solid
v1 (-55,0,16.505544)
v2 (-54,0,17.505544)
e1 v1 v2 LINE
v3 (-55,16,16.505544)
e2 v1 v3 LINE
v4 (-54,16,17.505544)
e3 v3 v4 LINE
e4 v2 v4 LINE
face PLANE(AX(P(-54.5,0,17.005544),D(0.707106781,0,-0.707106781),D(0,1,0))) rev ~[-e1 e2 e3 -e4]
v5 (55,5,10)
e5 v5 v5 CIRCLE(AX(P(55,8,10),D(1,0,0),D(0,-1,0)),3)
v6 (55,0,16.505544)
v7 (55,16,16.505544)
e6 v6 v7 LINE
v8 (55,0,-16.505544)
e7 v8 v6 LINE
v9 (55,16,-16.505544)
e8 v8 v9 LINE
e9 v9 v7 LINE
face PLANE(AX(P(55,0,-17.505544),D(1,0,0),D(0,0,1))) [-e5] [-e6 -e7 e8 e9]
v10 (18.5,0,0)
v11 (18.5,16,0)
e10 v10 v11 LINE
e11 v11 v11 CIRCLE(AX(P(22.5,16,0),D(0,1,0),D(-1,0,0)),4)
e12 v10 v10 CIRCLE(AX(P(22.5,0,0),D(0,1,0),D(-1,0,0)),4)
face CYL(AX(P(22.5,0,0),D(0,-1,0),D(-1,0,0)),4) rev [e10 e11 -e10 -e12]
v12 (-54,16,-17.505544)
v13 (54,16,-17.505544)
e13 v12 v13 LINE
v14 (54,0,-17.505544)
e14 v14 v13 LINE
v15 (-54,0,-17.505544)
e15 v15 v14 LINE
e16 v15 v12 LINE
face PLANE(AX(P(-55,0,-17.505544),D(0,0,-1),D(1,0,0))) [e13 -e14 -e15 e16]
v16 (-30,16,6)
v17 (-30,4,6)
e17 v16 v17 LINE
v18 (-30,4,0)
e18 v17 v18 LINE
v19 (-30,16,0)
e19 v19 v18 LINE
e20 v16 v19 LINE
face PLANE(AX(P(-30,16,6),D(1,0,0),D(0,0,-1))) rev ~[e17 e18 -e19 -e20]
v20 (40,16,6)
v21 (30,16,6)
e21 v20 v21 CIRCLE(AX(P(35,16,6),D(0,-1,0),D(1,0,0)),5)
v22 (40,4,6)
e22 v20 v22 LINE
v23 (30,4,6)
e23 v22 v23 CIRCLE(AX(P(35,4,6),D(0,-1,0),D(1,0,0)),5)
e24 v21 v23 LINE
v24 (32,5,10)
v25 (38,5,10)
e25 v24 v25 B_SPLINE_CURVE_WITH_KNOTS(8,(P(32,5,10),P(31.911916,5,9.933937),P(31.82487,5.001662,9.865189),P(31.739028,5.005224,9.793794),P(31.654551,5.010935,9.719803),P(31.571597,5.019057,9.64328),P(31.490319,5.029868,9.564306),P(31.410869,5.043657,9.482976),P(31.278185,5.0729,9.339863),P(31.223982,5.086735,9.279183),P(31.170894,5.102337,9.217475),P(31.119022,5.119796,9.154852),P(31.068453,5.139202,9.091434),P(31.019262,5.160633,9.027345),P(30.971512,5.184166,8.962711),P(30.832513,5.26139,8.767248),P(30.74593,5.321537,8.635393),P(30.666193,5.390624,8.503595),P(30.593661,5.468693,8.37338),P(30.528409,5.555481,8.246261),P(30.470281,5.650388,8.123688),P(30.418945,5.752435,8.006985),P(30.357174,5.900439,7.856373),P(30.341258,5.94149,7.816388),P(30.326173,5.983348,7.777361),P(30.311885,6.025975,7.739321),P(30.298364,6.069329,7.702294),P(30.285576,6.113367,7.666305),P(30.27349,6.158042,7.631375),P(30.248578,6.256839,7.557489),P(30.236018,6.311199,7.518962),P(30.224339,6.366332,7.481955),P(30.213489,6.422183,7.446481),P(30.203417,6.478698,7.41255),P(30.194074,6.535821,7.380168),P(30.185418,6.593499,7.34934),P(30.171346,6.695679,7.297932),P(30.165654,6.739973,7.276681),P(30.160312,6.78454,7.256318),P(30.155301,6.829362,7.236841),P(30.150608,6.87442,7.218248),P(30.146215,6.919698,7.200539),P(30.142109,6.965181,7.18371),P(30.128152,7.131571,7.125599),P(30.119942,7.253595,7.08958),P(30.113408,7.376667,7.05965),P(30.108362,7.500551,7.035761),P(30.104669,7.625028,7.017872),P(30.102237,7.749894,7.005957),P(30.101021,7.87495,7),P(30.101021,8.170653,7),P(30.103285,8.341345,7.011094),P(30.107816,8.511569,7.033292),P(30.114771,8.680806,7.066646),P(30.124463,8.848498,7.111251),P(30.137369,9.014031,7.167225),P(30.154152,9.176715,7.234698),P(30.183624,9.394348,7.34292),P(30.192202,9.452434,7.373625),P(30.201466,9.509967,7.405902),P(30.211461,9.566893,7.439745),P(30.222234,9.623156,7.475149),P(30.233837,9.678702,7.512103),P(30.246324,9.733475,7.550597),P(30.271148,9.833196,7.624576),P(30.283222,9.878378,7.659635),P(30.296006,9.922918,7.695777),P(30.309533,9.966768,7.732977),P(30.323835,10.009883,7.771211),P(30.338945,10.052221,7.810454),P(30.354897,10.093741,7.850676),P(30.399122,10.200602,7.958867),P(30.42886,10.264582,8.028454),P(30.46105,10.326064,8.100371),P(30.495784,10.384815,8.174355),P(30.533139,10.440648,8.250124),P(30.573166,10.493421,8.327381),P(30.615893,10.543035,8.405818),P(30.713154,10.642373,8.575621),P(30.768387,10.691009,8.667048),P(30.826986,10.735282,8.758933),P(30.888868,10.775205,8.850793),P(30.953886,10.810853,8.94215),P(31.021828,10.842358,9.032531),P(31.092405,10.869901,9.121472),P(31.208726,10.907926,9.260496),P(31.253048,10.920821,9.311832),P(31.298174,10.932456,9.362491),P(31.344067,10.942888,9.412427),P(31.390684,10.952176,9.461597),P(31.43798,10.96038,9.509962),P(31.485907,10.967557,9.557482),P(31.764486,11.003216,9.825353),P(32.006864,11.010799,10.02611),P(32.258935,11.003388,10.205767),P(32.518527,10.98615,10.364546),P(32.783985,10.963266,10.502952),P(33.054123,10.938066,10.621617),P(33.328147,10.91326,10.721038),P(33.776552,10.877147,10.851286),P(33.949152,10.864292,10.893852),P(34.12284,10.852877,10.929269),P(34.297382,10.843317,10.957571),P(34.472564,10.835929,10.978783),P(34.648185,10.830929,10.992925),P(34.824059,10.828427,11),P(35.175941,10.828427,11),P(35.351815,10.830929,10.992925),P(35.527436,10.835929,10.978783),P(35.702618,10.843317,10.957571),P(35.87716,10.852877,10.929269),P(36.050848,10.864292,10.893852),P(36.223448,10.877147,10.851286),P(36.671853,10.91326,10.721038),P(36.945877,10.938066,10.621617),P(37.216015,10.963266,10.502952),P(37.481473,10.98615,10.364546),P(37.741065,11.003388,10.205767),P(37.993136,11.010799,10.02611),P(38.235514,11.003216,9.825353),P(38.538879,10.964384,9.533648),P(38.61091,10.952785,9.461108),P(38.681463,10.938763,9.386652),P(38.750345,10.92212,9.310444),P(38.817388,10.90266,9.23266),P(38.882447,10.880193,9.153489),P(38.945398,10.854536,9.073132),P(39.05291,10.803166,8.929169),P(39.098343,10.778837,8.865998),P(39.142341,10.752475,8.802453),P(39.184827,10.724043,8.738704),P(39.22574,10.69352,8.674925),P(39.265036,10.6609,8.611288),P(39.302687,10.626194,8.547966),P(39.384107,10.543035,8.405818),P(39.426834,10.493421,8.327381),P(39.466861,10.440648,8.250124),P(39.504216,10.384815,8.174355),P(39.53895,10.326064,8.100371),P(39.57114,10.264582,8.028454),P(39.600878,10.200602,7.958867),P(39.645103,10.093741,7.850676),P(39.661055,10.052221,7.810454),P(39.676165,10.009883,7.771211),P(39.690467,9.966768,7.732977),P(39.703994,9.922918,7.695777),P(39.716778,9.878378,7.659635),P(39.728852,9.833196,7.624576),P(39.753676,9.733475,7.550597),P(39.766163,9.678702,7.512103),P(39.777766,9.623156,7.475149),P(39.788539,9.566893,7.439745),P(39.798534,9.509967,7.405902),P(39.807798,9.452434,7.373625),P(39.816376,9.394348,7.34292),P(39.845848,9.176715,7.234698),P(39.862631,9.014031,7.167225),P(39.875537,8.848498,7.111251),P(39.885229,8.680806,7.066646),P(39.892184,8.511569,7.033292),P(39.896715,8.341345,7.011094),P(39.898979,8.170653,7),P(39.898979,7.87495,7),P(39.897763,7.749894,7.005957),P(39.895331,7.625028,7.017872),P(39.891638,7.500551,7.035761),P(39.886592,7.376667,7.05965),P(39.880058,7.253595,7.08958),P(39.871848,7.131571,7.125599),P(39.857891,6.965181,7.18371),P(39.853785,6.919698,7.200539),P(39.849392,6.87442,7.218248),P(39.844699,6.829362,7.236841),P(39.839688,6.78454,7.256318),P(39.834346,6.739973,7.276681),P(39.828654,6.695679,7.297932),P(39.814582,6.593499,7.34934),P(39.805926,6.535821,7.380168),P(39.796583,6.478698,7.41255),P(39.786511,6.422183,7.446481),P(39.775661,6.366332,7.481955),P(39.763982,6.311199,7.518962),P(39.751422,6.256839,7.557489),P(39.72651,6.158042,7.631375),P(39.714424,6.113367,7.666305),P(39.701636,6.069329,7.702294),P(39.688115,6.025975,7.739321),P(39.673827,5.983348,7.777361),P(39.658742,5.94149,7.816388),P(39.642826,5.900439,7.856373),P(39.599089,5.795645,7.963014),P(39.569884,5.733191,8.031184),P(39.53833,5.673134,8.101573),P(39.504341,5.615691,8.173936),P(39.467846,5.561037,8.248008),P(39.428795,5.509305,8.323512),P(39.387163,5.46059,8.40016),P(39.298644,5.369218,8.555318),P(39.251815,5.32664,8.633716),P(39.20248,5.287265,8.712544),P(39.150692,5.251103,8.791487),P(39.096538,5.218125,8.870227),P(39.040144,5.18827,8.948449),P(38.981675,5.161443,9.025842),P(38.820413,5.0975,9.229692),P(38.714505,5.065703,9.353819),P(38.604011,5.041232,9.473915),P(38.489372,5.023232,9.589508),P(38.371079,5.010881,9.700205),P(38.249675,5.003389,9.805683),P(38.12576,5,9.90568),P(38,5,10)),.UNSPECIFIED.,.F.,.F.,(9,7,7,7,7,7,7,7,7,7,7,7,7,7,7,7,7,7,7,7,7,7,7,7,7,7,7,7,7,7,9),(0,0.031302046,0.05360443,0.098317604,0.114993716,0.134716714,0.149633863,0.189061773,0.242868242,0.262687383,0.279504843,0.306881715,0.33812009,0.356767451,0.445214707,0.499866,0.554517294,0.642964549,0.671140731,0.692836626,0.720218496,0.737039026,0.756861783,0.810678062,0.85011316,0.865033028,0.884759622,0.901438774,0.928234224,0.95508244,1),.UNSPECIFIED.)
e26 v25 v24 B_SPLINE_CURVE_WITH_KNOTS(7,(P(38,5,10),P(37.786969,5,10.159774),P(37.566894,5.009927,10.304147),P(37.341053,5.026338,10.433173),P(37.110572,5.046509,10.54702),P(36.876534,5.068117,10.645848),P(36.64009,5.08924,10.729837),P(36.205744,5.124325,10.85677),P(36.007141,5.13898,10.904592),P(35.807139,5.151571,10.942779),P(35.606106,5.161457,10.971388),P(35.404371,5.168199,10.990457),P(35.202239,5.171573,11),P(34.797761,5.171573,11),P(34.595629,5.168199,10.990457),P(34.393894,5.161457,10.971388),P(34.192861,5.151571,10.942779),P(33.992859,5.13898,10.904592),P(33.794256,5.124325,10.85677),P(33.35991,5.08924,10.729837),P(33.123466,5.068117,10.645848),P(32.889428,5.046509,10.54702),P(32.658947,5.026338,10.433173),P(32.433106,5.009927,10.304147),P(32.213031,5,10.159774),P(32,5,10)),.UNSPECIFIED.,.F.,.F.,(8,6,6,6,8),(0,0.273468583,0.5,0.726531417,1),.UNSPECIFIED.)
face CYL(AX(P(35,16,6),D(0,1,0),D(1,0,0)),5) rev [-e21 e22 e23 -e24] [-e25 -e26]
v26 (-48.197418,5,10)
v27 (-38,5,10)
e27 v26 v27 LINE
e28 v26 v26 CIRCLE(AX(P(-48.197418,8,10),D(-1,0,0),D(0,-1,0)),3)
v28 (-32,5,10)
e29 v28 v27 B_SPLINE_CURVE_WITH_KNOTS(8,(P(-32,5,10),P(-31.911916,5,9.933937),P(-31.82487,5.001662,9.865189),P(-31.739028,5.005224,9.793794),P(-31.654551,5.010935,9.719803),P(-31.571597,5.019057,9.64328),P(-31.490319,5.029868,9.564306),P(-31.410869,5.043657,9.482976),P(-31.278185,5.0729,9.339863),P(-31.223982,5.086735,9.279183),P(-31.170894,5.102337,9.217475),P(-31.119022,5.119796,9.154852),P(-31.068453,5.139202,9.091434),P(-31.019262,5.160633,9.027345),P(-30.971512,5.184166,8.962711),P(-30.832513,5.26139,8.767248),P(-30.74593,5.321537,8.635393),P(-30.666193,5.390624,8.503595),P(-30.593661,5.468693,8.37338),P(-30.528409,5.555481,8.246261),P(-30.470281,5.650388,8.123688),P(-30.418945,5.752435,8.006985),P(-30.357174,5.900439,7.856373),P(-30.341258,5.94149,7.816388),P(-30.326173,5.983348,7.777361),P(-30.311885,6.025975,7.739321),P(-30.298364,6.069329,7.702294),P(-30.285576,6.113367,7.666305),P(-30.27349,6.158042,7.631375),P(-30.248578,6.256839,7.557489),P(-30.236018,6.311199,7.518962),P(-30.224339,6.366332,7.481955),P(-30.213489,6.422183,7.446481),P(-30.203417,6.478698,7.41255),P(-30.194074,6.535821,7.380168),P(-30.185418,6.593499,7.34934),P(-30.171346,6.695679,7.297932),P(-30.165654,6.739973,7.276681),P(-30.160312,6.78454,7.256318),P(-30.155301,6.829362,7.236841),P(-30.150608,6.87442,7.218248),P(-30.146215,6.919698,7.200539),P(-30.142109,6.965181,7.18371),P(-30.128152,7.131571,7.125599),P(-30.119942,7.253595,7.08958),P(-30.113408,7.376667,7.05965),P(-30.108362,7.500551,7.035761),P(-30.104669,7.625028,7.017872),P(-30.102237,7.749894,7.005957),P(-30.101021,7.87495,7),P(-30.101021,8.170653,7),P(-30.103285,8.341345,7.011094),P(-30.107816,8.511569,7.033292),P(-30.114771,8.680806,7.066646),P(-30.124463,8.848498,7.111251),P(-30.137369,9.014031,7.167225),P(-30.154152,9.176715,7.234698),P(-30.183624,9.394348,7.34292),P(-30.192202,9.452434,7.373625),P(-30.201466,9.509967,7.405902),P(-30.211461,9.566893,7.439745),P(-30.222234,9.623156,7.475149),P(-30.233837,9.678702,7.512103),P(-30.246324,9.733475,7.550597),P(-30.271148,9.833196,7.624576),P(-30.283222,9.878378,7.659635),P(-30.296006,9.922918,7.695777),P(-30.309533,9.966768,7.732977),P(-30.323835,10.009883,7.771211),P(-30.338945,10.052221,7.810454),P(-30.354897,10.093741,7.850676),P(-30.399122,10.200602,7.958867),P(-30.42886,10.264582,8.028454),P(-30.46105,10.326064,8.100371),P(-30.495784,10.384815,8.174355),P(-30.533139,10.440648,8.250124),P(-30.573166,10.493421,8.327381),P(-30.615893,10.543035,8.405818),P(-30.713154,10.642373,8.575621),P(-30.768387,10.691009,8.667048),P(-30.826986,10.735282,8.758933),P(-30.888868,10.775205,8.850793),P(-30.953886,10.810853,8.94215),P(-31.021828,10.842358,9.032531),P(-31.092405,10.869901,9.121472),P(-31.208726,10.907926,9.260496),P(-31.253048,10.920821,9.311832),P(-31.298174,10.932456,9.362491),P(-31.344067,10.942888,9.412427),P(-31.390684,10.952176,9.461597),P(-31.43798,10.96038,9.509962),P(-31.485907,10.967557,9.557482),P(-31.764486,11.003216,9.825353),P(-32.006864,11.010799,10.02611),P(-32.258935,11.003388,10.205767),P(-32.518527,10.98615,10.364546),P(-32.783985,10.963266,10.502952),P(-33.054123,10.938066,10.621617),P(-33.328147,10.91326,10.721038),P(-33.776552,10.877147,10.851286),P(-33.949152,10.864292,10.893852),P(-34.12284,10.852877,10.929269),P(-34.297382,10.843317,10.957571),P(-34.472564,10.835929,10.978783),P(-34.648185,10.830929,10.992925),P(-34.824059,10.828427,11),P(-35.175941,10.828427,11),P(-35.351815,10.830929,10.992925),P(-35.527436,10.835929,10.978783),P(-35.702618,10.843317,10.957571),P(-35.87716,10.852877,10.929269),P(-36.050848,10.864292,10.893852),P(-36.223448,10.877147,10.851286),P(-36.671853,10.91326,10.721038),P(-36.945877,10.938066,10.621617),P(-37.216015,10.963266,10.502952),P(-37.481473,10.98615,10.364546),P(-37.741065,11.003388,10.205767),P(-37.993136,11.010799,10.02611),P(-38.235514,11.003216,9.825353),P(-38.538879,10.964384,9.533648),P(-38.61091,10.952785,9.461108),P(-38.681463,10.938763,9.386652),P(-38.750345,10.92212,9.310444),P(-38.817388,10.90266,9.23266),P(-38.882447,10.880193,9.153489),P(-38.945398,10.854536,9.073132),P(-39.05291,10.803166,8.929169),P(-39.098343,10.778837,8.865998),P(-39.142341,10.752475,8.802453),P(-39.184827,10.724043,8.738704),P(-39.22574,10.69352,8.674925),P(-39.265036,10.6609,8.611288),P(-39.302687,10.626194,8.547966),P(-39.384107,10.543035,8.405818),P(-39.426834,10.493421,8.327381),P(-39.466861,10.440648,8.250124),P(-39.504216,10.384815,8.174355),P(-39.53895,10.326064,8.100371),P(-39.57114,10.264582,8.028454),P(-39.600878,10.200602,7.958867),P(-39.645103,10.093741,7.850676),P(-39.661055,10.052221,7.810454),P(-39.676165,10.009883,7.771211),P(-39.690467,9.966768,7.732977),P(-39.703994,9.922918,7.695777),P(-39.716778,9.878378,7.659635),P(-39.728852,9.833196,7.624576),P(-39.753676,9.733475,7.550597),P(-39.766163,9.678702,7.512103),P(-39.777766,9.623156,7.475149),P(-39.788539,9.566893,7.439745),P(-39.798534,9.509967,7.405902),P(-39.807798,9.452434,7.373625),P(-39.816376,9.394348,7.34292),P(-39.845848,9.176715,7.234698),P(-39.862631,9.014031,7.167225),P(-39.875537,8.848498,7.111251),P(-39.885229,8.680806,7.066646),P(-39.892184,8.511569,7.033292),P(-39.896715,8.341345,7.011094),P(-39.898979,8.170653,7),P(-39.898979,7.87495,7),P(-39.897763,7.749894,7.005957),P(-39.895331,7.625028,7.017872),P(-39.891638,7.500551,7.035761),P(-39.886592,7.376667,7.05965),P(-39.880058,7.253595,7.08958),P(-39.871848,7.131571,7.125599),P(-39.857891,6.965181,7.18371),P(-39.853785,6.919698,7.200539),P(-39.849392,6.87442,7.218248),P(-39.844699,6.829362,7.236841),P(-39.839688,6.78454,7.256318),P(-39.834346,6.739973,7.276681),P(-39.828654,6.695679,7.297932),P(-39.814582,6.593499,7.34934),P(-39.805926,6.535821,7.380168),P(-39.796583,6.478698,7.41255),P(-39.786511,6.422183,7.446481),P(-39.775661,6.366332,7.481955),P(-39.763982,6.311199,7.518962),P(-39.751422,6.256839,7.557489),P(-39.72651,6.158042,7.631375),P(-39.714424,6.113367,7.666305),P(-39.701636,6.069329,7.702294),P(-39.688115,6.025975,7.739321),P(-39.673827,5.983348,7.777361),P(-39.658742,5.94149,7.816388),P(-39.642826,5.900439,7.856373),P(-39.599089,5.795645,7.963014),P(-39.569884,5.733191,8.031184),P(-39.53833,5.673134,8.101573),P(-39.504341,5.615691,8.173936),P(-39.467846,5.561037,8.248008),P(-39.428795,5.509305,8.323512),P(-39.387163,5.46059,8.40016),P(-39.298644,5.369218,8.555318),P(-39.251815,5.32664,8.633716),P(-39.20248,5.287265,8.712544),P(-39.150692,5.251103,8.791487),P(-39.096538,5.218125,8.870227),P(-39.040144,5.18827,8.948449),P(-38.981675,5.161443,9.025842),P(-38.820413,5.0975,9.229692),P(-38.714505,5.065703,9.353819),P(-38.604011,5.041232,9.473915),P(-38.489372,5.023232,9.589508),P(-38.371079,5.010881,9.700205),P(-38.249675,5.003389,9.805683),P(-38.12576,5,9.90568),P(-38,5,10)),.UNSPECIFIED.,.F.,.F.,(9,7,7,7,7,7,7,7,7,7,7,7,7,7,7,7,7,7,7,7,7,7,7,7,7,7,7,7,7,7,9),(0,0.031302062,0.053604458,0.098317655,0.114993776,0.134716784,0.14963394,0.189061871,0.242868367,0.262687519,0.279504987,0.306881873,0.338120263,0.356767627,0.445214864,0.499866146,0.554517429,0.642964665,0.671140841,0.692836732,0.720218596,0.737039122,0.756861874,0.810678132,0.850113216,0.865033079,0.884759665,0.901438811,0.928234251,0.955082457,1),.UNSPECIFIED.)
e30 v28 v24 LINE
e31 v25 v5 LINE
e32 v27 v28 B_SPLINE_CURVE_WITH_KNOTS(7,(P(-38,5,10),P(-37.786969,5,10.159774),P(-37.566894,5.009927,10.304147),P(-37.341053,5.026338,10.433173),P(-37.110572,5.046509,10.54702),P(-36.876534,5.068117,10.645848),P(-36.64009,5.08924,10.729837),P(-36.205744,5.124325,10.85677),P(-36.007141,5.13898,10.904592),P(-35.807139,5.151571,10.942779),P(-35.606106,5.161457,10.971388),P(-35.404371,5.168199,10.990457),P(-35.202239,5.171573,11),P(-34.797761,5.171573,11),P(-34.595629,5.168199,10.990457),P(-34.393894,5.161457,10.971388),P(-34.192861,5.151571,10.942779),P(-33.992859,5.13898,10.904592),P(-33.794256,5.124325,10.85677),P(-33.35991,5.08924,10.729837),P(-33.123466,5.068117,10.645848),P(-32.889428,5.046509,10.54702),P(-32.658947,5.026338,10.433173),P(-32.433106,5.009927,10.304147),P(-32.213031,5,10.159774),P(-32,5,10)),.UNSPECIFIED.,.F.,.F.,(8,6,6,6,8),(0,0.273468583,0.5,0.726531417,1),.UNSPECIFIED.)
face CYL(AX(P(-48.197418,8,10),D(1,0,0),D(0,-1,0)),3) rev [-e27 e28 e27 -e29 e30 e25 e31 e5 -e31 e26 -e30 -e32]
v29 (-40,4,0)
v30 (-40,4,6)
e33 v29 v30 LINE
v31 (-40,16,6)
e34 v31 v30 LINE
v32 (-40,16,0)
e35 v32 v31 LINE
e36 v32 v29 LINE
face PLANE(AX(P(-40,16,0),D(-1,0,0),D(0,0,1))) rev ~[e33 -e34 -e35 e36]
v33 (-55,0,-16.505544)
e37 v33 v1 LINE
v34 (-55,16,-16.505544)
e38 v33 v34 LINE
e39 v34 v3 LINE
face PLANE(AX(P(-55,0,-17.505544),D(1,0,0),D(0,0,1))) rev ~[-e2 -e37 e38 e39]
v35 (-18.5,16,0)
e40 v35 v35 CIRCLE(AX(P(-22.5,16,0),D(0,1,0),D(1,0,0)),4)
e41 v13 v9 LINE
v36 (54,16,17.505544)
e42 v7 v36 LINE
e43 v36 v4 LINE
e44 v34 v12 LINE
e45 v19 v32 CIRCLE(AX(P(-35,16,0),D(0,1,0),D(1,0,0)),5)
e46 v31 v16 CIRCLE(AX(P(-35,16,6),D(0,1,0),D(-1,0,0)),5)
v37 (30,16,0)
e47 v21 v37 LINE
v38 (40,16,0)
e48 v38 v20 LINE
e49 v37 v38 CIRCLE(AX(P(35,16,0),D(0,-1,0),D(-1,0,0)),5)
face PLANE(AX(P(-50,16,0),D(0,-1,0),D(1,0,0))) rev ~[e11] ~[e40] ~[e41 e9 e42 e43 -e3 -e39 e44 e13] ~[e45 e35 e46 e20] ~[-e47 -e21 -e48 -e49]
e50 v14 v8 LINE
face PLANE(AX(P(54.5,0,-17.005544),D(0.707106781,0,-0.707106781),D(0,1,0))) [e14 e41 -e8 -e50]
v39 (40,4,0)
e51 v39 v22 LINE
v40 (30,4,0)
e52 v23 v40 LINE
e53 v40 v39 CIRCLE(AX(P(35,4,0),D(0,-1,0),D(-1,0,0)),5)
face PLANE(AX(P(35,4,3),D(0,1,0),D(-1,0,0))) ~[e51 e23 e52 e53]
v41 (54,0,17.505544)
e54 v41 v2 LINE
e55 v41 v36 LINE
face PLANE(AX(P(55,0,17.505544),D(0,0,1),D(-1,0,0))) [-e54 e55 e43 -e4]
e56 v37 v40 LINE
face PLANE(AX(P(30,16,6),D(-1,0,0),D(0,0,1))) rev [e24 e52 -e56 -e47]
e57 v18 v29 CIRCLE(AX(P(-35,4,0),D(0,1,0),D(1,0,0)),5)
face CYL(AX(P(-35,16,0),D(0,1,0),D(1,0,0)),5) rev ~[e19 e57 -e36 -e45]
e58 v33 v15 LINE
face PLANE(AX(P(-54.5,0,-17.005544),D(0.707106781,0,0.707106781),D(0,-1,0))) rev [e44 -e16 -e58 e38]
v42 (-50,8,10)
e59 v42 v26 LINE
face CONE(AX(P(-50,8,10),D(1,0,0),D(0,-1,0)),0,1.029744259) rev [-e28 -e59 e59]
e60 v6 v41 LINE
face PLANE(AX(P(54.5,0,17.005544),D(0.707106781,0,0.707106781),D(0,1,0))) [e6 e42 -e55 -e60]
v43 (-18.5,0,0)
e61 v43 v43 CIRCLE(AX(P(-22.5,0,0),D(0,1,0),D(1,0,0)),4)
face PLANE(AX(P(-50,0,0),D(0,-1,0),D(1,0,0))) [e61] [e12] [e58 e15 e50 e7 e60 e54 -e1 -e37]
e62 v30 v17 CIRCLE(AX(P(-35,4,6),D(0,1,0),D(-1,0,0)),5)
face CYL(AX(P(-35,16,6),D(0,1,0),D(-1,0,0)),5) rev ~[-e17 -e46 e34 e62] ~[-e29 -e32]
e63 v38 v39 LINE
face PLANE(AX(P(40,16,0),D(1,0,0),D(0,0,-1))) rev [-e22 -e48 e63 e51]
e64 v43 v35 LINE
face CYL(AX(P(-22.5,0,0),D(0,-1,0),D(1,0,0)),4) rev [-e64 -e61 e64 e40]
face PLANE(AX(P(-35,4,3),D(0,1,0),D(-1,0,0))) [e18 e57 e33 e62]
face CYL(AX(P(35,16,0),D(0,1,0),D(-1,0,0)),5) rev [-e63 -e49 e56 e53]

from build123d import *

# Parameters (mm, degrees)
F1_W     = 10
F1_H     = 35.0110880776
F1_W_2   = 90
F1_R     = 5
F2_DEPTH = 16
F3_SIZE  = 1
F7_DEPTH = 12


# Not quite as in the source:
# - a feature of the source that left no trace in its solid (it failed there, or was rolled back) is left out
# - a pattern or mirror of a feature is missing from the dataset's text; its kind, count and spacing are read off the source's solid


with BuildPart() as f2:
    # F1 (on Front) → F2 (new body)
    with BuildSketch(Plane.XZ):
        with Locations((-50, 0)):
            Rectangle(F1_W, F1_H)
        Rectangle(F1_W_2, F1_H)
        with Locations((-35, 0)):
            Circle(F1_R, mode=Mode.SUBTRACT)
        with BuildLine():
            ThreePointArc((-26.5, 0), (-22.5, 4), (-18.5, 0))
            ThreePointArc((-18.5, 0), (-22.5, -4), (-26.5, 0))
        make_face(mode=Mode.SUBTRACT)
        with BuildLine():
            ThreePointArc((26.5, 0), (22.5, -4), (18.5, 0))
            ThreePointArc((18.5, 0), (22.5, 4), (26.5, 0))
        make_face(mode=Mode.SUBTRACT)
        with BuildLine():
            ThreePointArc((40, 0), (35, -5), (30, 0))
            ThreePointArc((30, 0), (35, 5), (40, 0))
        make_face(mode=Mode.SUBTRACT)
        with Locations((-35, 0)):
            Circle(F1_R)
        with BuildLine():
            ThreePointArc((40, 0), (35, 5), (30, 0))
            ThreePointArc((30, 0), (35, -5), (40, 0))
        make_face()
        with Locations((50, 0)):
            Rectangle(F1_W, F1_H)
    extrude(amount=-F2_DEPTH)

    # F3
    f3_edges = [f2.edges().sort_by_distance(p)[0] for p in [
        (55, 8, -17.505544),
        (55, 8, 17.505544),
        (-55, 8, -17.505544),
        (-55, 8, 17.505544),
    ]]
    chamfer(f3_edges, length=F3_SIZE)

    # F4 (on offset) → F5 (revolve, cut)
    with BuildSketch(Plane.XY.offset(10)):
        Polygon((57.6581534887, 5), (57.6581534887, 8), (-50, 8), (-48.1974181429, 5), align=None)
    revolve(axis=Axis((3.8290767443, 8, 10), (-1, 0, 0)), mode=Mode.SUBTRACT)

    # F6 (on face) → F7 (cut)
    with BuildSketch(Plane(origin=(0, 16, 0), x_dir=(-1, 0, 0), z_dir=(0, 1, 0))):
        with BuildLine():
            Line((30, 6), (30, 0))
            ThreePointArc((30, 0), (35, -5), (40, 0))
            Line((40, 0), (40, 6))
            ThreePointArc((40, 6), (35, 11), (30, 6))
        make_face()
    f7 = extrude(amount=-F7_DEPTH, mode=Mode.SUBTRACT)

    # F7_copies: F7 across plane
    add(f7.mirror(Plane(origin=(0, 0, 0), x_dir=(0, 0, 1), z_dir=(1, 0, 0))), mode=Mode.SUBTRACT)


solid = f2.part
